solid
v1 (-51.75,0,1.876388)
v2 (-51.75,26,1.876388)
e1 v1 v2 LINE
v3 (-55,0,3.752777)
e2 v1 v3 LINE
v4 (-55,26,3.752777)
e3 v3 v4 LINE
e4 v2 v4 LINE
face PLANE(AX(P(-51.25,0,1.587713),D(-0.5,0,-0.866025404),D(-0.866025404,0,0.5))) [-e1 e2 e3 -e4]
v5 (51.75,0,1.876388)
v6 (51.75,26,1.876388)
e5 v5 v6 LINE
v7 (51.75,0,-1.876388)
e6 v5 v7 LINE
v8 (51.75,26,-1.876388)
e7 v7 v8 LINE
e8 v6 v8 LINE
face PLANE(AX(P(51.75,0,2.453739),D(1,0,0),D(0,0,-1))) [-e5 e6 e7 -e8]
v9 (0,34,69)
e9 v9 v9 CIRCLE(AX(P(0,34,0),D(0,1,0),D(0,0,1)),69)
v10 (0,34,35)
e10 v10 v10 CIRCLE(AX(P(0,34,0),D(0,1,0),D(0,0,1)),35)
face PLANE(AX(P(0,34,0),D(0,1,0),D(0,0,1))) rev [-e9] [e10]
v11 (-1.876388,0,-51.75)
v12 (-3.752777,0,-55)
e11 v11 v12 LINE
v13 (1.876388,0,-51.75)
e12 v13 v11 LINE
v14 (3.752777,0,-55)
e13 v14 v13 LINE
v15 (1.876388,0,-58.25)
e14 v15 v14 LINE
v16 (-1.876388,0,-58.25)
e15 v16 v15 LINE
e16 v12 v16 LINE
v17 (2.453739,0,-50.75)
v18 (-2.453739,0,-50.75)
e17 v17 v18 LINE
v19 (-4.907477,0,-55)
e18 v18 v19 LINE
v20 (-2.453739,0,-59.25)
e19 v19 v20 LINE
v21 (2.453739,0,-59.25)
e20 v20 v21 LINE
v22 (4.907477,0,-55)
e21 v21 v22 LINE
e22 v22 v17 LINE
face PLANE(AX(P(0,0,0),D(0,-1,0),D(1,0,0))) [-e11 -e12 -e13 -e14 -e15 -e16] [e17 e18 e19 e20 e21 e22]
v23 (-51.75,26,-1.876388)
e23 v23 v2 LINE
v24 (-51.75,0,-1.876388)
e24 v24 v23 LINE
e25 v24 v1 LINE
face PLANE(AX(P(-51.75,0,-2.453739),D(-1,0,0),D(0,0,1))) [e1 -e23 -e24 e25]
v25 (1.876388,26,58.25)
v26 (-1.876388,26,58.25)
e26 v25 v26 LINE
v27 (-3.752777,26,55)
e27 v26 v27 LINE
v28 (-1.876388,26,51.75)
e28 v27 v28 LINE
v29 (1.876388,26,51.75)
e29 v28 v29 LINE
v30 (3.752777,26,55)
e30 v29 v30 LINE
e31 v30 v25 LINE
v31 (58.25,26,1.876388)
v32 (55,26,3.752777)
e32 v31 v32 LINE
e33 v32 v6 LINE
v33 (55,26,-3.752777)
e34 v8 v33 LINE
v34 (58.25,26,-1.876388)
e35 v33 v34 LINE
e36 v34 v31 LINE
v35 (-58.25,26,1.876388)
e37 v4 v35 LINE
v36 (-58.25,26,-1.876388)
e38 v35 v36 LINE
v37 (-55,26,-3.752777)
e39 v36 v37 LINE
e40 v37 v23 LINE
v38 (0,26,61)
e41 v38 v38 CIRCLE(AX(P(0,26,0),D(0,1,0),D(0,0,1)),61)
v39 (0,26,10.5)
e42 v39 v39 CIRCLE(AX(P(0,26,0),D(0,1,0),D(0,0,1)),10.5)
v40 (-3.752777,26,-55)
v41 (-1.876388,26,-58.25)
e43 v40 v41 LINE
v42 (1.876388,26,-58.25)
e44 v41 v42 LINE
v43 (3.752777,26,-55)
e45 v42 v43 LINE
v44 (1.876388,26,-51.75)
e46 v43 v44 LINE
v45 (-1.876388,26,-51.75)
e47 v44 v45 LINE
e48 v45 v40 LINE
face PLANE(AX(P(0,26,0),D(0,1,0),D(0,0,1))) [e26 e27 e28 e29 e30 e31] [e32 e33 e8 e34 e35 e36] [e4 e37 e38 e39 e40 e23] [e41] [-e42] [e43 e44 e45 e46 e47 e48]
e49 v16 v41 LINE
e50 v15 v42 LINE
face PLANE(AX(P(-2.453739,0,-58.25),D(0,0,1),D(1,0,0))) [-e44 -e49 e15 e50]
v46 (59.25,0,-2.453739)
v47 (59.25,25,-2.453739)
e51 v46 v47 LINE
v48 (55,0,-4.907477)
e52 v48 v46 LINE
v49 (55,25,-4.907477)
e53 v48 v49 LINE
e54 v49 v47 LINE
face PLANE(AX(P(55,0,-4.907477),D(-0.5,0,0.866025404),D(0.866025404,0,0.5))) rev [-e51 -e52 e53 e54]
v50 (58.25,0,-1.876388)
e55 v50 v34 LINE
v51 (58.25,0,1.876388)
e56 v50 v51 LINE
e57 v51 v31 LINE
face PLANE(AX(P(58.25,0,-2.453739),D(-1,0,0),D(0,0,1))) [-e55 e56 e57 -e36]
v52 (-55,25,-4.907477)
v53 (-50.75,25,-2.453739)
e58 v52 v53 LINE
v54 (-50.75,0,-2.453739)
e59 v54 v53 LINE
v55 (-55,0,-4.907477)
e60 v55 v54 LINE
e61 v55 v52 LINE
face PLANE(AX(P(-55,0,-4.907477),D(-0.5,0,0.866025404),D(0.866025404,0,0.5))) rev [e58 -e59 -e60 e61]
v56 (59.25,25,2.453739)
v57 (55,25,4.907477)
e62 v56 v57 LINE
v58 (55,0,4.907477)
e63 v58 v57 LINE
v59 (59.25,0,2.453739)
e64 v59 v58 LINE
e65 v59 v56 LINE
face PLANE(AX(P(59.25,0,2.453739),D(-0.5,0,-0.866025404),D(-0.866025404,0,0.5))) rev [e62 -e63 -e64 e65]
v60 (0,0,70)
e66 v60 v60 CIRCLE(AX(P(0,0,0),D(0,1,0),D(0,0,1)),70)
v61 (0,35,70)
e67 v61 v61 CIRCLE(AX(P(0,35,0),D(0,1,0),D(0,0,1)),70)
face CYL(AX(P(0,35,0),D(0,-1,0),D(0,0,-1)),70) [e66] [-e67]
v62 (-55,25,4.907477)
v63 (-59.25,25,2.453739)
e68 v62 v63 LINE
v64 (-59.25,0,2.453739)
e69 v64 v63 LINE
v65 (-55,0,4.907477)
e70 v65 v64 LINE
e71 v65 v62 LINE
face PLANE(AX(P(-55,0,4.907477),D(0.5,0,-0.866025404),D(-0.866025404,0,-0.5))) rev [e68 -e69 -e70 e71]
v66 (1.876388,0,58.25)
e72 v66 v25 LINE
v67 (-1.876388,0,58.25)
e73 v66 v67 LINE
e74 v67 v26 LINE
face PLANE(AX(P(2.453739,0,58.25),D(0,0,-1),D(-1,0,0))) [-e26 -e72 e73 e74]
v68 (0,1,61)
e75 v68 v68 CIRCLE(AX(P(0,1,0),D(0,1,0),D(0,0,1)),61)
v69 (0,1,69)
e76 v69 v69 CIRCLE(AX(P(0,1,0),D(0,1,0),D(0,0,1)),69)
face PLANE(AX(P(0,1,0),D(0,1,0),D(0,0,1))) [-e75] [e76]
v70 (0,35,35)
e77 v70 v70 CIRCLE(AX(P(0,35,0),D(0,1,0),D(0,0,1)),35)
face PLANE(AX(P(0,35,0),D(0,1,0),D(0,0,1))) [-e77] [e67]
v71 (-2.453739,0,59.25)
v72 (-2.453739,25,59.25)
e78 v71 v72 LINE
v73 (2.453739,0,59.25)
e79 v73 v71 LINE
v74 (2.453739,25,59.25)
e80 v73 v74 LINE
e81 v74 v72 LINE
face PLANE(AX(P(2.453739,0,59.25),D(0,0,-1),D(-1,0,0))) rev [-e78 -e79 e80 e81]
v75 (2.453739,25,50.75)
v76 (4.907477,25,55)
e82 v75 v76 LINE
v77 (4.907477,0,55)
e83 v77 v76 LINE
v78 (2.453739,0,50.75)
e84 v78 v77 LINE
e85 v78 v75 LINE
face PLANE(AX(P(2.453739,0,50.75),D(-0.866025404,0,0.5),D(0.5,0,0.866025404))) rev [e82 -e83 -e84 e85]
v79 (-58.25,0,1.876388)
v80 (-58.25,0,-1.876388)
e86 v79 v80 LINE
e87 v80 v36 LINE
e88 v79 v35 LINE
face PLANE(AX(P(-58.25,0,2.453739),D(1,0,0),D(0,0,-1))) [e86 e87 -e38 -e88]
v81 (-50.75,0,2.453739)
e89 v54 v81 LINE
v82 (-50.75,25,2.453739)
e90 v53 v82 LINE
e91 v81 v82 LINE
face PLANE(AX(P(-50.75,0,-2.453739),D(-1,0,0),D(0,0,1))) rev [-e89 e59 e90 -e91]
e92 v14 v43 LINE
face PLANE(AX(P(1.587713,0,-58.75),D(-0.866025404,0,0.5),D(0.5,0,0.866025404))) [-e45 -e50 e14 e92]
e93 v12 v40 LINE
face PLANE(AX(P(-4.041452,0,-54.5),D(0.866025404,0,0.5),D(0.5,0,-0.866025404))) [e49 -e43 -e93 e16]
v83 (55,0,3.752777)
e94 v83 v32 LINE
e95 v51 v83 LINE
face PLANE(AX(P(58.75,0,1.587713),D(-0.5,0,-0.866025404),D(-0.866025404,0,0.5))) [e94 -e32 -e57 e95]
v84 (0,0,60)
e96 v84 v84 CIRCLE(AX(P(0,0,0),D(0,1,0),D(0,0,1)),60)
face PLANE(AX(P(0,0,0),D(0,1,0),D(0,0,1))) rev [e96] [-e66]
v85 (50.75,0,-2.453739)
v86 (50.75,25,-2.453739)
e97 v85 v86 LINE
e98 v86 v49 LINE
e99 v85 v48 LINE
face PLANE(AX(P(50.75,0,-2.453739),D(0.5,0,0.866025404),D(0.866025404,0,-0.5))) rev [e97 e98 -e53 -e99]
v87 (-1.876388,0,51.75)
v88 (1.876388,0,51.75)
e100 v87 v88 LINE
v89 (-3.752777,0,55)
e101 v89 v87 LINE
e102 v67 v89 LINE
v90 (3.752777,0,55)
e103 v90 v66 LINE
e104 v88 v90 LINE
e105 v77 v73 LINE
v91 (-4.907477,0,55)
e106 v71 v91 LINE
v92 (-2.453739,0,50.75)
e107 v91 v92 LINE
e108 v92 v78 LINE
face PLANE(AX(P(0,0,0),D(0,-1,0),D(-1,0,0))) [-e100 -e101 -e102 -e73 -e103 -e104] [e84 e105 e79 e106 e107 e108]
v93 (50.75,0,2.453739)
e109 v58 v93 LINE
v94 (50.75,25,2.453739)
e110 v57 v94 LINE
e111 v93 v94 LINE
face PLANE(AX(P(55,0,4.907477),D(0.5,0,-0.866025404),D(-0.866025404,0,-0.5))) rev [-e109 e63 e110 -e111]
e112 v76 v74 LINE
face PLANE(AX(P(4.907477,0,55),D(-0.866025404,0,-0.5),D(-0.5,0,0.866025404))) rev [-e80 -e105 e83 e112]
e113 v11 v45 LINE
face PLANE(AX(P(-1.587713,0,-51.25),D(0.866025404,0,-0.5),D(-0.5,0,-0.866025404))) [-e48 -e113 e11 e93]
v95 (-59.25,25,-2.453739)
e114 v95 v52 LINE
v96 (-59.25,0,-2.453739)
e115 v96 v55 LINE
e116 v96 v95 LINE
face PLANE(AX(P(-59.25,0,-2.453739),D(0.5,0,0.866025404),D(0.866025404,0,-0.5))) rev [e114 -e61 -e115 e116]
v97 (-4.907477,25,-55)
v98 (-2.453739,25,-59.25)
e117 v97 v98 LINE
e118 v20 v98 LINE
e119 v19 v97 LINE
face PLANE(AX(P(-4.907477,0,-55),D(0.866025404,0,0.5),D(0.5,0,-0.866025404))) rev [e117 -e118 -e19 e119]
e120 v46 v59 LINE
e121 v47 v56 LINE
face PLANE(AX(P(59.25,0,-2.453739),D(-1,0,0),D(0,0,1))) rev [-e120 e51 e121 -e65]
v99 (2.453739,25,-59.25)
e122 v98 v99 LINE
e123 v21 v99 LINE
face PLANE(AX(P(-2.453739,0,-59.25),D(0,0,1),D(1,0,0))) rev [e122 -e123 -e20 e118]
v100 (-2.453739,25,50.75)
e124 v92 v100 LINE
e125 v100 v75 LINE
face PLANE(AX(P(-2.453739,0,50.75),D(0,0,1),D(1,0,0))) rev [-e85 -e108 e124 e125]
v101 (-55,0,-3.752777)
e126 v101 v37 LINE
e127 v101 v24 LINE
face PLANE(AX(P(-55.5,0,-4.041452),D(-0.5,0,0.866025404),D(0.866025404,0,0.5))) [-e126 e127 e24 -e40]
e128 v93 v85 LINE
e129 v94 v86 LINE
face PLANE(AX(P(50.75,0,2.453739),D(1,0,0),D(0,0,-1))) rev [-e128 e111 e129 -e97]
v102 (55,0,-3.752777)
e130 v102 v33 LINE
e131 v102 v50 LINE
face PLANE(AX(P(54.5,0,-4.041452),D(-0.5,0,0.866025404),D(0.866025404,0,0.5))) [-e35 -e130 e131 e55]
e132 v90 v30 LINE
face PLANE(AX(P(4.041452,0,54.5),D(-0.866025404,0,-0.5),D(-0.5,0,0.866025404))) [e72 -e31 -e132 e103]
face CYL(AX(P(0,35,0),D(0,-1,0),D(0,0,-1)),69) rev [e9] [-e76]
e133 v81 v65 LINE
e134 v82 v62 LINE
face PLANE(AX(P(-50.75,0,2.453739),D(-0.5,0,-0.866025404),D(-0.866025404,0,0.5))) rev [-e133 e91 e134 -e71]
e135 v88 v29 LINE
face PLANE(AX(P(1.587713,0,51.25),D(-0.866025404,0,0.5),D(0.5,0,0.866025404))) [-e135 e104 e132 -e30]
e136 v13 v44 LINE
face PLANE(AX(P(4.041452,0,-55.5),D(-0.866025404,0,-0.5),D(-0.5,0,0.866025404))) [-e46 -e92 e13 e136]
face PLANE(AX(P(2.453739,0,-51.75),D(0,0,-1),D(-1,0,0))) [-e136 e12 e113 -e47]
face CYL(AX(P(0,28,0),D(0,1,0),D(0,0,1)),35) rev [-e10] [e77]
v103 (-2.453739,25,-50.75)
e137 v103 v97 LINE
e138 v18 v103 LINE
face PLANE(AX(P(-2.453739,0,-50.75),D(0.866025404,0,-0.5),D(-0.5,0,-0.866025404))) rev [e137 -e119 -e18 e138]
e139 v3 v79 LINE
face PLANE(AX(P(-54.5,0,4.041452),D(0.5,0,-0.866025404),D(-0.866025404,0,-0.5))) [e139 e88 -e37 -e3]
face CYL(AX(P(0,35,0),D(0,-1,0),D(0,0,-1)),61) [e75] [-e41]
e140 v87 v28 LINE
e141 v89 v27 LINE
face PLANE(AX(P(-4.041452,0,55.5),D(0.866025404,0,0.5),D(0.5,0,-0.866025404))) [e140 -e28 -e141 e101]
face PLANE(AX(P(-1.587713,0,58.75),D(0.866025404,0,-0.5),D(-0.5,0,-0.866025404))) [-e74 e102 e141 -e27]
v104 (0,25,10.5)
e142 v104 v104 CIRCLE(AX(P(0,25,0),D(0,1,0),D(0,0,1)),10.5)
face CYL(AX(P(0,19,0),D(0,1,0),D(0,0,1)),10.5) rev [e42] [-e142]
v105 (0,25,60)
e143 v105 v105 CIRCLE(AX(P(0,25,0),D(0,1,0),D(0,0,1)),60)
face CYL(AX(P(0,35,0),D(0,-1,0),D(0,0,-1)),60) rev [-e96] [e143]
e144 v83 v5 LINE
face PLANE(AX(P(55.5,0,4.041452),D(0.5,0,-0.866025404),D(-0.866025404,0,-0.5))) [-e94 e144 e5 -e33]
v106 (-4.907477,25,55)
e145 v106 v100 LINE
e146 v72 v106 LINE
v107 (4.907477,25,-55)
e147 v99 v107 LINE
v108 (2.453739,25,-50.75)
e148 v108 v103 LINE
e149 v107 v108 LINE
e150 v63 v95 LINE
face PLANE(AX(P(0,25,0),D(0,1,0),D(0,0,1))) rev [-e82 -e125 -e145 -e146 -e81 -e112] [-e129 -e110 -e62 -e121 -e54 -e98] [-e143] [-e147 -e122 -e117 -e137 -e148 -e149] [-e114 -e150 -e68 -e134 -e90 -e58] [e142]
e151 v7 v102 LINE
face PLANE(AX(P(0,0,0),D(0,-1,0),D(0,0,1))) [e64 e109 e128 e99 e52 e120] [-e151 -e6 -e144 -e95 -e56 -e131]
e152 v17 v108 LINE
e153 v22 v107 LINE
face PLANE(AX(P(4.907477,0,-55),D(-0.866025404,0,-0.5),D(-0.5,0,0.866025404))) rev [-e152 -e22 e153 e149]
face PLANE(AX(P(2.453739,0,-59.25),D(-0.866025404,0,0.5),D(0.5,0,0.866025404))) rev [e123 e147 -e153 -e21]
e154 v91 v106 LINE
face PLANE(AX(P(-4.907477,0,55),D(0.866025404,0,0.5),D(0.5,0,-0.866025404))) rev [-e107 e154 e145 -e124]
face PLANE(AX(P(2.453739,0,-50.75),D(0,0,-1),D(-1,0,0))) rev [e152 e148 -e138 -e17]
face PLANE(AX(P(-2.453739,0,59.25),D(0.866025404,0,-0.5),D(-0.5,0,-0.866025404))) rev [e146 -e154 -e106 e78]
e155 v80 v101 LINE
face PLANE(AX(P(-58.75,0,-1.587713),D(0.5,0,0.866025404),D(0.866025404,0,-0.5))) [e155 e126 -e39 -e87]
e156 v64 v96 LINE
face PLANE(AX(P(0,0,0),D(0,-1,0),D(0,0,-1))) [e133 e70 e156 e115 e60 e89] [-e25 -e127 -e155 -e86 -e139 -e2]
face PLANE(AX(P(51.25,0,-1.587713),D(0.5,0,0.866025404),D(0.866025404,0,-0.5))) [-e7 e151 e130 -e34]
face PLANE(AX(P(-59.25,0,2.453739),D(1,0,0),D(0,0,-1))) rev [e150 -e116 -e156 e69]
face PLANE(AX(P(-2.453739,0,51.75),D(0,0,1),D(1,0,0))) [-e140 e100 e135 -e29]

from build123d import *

# Parameters (mm, degrees)
SKETCH1_R           = 70
BOSS_EXTRUDE1_DEPTH = 35
SHELL6_T            = -10
BOSS_EXTRUDE3_DEPTH = 25
SHELL13_T           = -1
CIRPATTERN6_COUNT   = 4
CIRPATTERN7_DEPTH   = 26
SKETCH2_R           = 35
CUT_EXTRUDE5_DEPTH  = 7
SKETCH6_R           = 10.5
CUT_EXTRUDE6_DEPTH  = 7


# Read off the part's stored shape, not the designer's step: CirPattern7
with BuildPart() as part:
    # Sketch1 → Boss-Extrude1 (new body)
    with BuildSketch(Plane(origin=(0, 0, 0), x_dir=(1, 0, 0), z_dir=(0, 1, 0))):
        with Locations(Location((0, 0, 0), (0, 0, 270))):
            Circle(SKETCH1_R)
    extrude(amount=BOSS_EXTRUDE1_DEPTH)

    # Shell6
    shell6_openings = [part.faces().sort_by_distance(p)[0] for p in [
        (0, 0, 0),
    ]]
    offset(amount=SHELL6_T, openings=shell6_openings, kind=Kind.INTERSECTION)

    # Sketch5 → Boss-Extrude3 (add, through all)
    with BuildSketch(Plane.XZ.offset(-25)):
        Polygon((-55, 4.907477288), (-59.25, 2.453738644), (-59.25, -2.453738644), (-55, -4.907477288), (-50.75, -2.453738644), (-50.75, 2.453738644), align=None)
    boss_extrude3 = extrude(amount=BOSS_EXTRUDE3_DEPTH)

    # Shell13
    shell13_openings = [part.faces().sort_by_distance(p)[0] for p in [
        (-55, 0, 0),
    ]]
    offset(amount=SHELL13_T, openings=shell13_openings, kind=Kind.INTERSECTION)

    # CirPattern6: Boss-Extrude3 ×4 about axis
    cirpattern6_axis = Axis((0, 0, 0), (0, 1, 0))
    for i in range(1, CIRPATTERN6_COUNT):
        add(boss_extrude3.rotate(cirpattern6_axis, i * 360 / CIRPATTERN6_COUNT))

    # CirPattern7 outline → CirPattern7 (cut)
    with BuildSketch(Plane(origin=(0, 0, 0), x_dir=(1, 0, 0), z_dir=(0, 1, 0))):
        Polygon((-1.876388375, 51.75), (1.876388375, 51.75), (3.75277675, 55), (1.876388375, 58.25), (-1.876388375, 58.25), (-3.75277675, 55), align=None)
        Polygon((51.75, -1.876388375), (55, -3.75277675), (58.25, -1.876388375), (58.25, 1.876388375), (55, 3.75277675), (51.75, 1.876388375), align=None)
        Polygon((1.876388375, -51.75), (-1.876388375, -51.75), (-3.75277675, -55), (-1.876388375, -58.25), (1.876388375, -58.25), (3.75277675, -55), align=None)
    extrude(amount=CIRPATTERN7_DEPTH, mode=Mode.SUBTRACT)

    # Sketch2 → Cut-Extrude5 (cut)
    with BuildSketch(Plane(origin=(0, 35, 0), x_dir=(1, 0, 0), z_dir=(0, 1, 0))):
        with Locations(Location((0, 0, 0), (0, 0, 270))):
            Circle(SKETCH2_R)
    extrude(amount=-CUT_EXTRUDE5_DEPTH, mode=Mode.SUBTRACT)

    # Sketch6 → Cut-Extrude6 (cut)
    with BuildSketch(Plane(origin=(0, 26, 0), x_dir=(1, 0, 0), z_dir=(0, 1, 0))):
        with Locations(Location((0, 0, 0), (0, 0, 270))):
            Circle(SKETCH6_R)
    extrude(amount=-CUT_EXTRUDE6_DEPTH, mode=Mode.SUBTRACT)


solid = part.part
